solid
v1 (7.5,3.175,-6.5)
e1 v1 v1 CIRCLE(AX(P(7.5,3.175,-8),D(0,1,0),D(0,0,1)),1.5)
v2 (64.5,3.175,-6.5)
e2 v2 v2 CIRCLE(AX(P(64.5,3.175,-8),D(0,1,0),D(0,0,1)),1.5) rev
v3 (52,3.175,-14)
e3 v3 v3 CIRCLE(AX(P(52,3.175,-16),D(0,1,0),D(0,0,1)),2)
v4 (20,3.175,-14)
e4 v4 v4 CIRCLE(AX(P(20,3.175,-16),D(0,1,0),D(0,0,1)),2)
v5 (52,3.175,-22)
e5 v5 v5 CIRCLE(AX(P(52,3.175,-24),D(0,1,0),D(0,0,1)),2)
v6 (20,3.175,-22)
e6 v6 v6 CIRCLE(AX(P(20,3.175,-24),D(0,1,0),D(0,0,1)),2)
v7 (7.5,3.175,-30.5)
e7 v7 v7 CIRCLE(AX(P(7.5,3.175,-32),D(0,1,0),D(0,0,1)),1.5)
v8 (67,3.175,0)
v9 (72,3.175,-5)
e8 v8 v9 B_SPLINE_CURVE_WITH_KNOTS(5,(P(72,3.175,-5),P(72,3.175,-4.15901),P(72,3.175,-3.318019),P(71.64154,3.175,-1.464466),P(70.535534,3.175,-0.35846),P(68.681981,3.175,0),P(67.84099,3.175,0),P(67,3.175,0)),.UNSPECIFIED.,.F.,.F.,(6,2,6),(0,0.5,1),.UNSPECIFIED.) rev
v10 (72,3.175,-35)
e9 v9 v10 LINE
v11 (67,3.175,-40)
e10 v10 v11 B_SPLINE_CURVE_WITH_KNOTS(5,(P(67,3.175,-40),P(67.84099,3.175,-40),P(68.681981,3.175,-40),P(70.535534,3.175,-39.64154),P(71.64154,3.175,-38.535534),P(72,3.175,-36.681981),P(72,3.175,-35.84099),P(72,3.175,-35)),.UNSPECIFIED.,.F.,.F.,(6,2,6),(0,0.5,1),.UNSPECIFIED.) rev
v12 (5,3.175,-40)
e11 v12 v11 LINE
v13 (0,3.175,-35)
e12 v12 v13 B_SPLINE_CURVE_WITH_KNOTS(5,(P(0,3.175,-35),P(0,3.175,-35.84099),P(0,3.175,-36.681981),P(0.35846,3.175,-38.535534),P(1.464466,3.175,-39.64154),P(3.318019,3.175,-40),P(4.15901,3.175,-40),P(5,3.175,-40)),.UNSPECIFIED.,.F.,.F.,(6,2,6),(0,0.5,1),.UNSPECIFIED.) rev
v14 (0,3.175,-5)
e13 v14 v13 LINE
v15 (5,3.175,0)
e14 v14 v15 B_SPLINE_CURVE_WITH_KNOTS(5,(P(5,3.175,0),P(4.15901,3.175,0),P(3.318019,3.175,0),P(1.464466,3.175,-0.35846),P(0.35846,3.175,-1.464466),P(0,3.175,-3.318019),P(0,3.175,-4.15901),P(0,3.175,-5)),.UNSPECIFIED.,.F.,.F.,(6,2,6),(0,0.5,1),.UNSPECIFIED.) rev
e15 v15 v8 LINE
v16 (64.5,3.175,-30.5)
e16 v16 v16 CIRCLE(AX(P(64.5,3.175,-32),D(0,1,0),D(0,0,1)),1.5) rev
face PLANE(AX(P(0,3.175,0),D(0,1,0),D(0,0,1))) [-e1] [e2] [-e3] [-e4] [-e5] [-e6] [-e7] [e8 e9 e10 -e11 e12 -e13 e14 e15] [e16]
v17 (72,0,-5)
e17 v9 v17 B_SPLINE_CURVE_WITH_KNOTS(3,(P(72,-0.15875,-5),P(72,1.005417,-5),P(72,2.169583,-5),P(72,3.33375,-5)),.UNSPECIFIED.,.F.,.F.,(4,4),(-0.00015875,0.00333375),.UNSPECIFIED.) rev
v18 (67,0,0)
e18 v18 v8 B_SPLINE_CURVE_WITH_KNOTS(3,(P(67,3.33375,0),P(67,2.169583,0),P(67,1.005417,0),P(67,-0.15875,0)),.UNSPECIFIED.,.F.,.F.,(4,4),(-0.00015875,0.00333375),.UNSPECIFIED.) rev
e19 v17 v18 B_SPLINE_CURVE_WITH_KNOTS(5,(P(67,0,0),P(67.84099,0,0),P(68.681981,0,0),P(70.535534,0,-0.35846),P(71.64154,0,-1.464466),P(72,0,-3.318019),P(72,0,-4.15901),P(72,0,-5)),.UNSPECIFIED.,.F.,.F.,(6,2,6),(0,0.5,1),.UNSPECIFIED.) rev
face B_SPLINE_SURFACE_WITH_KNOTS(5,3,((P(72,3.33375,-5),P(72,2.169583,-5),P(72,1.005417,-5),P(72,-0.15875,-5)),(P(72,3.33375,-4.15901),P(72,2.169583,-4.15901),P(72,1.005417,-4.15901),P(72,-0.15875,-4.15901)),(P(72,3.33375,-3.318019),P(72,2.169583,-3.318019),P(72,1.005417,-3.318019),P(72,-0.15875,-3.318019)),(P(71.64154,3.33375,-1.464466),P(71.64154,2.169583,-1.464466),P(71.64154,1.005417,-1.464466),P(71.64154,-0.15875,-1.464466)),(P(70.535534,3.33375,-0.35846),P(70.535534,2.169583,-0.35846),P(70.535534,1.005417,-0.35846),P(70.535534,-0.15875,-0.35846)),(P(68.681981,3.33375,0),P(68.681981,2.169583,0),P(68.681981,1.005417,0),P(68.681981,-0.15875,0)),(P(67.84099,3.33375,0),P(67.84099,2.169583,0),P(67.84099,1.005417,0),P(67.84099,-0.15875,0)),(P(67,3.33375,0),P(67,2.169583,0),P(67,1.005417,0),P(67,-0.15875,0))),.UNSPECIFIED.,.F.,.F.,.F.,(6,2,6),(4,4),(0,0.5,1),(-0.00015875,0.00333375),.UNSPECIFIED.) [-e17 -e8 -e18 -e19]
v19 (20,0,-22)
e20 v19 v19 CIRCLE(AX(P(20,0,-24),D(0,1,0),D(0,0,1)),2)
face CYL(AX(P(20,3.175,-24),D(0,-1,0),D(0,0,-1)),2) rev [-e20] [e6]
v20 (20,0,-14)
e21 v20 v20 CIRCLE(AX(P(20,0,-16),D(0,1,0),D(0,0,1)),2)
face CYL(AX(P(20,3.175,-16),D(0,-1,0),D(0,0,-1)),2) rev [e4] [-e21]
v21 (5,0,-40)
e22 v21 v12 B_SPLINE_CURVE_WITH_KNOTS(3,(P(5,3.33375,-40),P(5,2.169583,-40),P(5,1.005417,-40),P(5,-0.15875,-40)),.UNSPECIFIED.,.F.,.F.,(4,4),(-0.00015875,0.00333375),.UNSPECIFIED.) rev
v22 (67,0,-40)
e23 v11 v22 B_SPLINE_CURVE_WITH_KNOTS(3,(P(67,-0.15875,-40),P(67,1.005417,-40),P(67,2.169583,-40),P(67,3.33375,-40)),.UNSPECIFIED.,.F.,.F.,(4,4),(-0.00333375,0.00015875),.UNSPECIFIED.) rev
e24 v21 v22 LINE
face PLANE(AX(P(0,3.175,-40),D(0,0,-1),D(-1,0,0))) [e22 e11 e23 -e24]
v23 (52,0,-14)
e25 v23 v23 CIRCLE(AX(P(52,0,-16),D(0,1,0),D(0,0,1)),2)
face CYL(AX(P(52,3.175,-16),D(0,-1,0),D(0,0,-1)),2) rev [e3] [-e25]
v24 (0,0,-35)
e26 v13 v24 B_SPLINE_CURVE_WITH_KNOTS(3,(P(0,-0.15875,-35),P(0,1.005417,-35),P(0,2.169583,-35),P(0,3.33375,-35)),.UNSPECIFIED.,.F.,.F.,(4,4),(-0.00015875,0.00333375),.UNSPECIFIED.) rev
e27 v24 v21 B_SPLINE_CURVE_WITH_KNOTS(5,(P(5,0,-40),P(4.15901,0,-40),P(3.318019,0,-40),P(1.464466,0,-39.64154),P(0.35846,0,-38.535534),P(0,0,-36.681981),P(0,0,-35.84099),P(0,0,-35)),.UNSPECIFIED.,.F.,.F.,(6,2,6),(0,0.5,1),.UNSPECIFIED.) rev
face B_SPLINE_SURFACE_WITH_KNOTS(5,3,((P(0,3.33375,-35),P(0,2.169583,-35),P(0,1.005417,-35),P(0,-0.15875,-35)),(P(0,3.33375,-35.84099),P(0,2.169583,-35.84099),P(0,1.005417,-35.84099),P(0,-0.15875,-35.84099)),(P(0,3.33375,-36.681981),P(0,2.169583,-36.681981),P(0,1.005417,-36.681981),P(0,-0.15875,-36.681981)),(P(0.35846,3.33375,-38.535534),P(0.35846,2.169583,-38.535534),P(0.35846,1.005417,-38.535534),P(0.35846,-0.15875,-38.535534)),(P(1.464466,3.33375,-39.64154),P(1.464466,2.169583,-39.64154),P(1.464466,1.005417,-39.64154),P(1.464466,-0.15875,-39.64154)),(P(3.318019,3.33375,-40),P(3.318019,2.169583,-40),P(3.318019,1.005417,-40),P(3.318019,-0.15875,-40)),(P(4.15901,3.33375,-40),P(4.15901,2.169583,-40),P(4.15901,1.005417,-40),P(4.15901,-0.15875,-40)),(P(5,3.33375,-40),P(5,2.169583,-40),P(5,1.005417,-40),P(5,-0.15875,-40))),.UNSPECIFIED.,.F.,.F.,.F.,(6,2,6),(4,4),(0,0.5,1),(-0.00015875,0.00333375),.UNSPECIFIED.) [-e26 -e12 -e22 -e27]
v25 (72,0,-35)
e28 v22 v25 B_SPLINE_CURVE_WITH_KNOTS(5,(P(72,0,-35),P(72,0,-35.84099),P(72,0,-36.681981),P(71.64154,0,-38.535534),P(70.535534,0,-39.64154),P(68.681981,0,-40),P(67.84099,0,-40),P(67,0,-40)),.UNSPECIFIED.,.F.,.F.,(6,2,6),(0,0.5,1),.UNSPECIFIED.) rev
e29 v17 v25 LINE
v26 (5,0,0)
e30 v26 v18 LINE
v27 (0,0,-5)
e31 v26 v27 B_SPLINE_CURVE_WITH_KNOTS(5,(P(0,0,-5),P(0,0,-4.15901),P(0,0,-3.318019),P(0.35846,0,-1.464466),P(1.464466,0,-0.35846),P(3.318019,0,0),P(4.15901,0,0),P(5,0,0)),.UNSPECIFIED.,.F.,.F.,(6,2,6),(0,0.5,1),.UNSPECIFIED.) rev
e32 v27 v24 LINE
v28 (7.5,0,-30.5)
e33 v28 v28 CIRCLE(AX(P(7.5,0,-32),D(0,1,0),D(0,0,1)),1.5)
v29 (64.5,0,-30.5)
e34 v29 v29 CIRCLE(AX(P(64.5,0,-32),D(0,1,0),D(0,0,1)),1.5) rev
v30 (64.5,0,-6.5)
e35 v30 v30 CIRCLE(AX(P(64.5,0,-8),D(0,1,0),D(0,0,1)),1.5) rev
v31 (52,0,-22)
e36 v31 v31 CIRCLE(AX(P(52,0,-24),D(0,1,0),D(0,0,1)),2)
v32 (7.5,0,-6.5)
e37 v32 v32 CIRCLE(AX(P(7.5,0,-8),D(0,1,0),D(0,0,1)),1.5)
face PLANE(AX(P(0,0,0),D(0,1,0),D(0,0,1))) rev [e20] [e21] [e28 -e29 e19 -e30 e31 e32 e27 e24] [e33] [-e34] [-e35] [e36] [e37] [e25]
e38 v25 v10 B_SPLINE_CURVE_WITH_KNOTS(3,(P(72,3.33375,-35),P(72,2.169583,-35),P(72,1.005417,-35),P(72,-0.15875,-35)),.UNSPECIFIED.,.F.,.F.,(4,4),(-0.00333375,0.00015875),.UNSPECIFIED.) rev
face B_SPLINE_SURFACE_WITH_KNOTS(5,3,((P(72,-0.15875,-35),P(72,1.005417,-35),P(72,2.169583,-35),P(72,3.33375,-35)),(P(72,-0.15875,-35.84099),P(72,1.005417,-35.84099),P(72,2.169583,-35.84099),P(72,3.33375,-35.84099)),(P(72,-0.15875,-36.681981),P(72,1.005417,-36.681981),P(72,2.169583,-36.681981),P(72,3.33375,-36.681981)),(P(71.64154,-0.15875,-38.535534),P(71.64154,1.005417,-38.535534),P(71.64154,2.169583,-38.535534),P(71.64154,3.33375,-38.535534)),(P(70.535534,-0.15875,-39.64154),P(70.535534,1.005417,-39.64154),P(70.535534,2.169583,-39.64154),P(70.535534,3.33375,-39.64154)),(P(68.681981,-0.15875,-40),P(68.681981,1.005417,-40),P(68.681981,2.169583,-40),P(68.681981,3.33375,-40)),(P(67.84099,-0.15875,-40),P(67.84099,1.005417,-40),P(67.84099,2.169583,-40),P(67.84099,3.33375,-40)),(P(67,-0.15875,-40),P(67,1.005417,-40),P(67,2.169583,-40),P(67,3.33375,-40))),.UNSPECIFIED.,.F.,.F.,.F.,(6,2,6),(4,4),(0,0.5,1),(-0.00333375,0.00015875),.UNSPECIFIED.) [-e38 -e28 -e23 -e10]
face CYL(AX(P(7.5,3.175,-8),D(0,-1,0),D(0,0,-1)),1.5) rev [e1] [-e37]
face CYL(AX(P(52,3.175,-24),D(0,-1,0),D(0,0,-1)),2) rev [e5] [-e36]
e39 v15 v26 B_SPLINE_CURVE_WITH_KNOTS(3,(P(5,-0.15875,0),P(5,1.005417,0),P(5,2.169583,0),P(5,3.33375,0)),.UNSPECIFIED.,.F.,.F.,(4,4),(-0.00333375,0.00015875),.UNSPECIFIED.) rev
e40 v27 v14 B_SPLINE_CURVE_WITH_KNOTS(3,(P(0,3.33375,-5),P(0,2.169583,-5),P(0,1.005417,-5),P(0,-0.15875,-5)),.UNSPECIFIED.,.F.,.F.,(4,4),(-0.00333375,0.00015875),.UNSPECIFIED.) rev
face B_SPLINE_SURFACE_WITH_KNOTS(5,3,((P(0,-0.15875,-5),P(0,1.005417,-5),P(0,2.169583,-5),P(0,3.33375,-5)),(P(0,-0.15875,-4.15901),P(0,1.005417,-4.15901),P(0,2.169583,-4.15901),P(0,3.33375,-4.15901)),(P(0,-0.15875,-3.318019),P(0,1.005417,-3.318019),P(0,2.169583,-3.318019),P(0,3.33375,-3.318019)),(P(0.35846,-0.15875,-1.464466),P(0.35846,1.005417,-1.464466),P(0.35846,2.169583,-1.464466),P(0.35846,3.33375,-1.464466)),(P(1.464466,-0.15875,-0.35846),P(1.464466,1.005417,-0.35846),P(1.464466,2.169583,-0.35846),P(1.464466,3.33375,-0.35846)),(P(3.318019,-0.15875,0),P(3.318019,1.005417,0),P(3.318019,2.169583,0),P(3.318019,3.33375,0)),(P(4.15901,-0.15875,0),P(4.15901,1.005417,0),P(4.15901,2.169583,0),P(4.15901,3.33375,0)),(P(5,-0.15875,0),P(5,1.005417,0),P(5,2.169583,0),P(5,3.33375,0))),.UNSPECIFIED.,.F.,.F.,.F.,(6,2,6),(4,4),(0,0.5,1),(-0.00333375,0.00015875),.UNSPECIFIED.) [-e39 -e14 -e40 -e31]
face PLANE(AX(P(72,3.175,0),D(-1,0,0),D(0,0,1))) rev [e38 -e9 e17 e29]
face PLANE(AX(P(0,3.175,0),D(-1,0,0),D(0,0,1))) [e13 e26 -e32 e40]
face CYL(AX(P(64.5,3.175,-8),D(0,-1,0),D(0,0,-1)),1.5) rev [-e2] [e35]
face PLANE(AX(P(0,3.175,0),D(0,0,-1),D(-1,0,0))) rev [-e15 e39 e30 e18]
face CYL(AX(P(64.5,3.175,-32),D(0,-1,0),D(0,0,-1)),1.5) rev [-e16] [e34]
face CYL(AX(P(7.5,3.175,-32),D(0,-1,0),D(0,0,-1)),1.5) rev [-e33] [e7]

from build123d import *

# Parameters (mm, degrees)
SKETCH1_W           = 72
SKETCH1_H           = 40
SKETCH1_R           = 2
SKETCH1_R_2         = 1.5
BOSS_EXTRUDE1_DEPTH = 3.175
FILLET1_SIZE        = 5


with BuildPart() as part:
    # Sketch1 → Boss-Extrude1 (new body)
    with BuildSketch(Plane(origin=(0, 0, 0), x_dir=(1, 0, 0), z_dir=(0, 1, 0))):
        with Locations((36, 20)):
            Rectangle(SKETCH1_W, SKETCH1_H)
        with Locations(Location((20, 24, 0), (0, 0, 270))):
            Circle(SKETCH1_R, mode=Mode.SUBTRACT)
        with Locations(Location((20, 16, 0), (0, 0, 270))):
            Circle(SKETCH1_R, mode=Mode.SUBTRACT)
        with Locations(Location((52, 24, 0), (0, 0, 270))):
            Circle(SKETCH1_R, mode=Mode.SUBTRACT)
        with Locations(Location((52, 16, 0), (0, 0, 270))):
            Circle(SKETCH1_R, mode=Mode.SUBTRACT)
        with Locations(Location((7.5, 32, 0), (0, 0, 270))):
            Circle(SKETCH1_R_2, mode=Mode.SUBTRACT)
        with Locations(Location((7.5, 8, 0), (0, 0, 270))):
            Circle(SKETCH1_R_2, mode=Mode.SUBTRACT)
        with Locations(Location((64.5, 8, 0), (0, 0, 270))):
            Circle(SKETCH1_R_2, mode=Mode.SUBTRACT)
        with Locations(Location((64.5, 32, 0), (0, 0, 270))):
            Circle(SKETCH1_R_2, mode=Mode.SUBTRACT)
    extrude(amount=BOSS_EXTRUDE1_DEPTH)

    # Fillet1
    # a fillet whose section is not a circle: 5 mm, written as the material it takes off along each edge
    with BuildSketch(Plane(origin=(0, -12.5, -40), x_dir=(1, 0, 0), z_dir=(0, 1, 0)), Plane(origin=(72, -12.5, 0), x_dir=(-1, 0, 0), z_dir=(0, 1, 0)), Plane(origin=(72, -12.5, -40), x_dir=(0, 0, 1), z_dir=(0, 1, 0))) as fillet1_piece_1:
        with BuildLine():
            add(Edge.make_bspline([(FILLET1_SIZE, 0), (FILLET1_SIZE * 0.831801948466, 0), (FILLET1_SIZE * 0.663603896932, 0), (FILLET1_SIZE * 0.292893218813, -FILLET1_SIZE * 0.0716919198361), (FILLET1_SIZE * 0.0716919198361, -FILLET1_SIZE * 0.292893218813), (0, -FILLET1_SIZE * 0.663603896932), (0, -FILLET1_SIZE * 0.831801948466), (0, -FILLET1_SIZE)], knots=[0, 0, 0, 0, 0, 0, 0.5, 0.5, 1, 1, 1, 1, 1, 1], degree=5))
            Line((0, -FILLET1_SIZE), (0, 0))
            Line((0, 0), (FILLET1_SIZE, 0))
        make_face()
    extrude(amount=28.175, mode=Mode.SUBTRACT)
    with BuildSketch(Plane(origin=(0, -12.5, 0), x_dir=(1, 0, 0), z_dir=(0, 1, 0))) as fillet1_piece_2:
        with BuildLine():
            add(Edge.make_bspline([(FILLET1_SIZE, 0), (FILLET1_SIZE * 0.831801948466, 0), (FILLET1_SIZE * 0.663603896932, 0), (FILLET1_SIZE * 0.292893218813, FILLET1_SIZE * 0.0716919198361), (FILLET1_SIZE * 0.0716919198361, FILLET1_SIZE * 0.292893218813), (0, FILLET1_SIZE * 0.663603896932), (0, FILLET1_SIZE * 0.831801948466), (0, FILLET1_SIZE)], knots=[0, 0, 0, 0, 0, 0, 0.5, 0.5, 1, 1, 1, 1, 1, 1], degree=5))
            Line((0, FILLET1_SIZE), (0, 0))
            Line((0, 0), (FILLET1_SIZE, 0))
        make_face()
    extrude(amount=28.175, mode=Mode.SUBTRACT)


solid = part.part
